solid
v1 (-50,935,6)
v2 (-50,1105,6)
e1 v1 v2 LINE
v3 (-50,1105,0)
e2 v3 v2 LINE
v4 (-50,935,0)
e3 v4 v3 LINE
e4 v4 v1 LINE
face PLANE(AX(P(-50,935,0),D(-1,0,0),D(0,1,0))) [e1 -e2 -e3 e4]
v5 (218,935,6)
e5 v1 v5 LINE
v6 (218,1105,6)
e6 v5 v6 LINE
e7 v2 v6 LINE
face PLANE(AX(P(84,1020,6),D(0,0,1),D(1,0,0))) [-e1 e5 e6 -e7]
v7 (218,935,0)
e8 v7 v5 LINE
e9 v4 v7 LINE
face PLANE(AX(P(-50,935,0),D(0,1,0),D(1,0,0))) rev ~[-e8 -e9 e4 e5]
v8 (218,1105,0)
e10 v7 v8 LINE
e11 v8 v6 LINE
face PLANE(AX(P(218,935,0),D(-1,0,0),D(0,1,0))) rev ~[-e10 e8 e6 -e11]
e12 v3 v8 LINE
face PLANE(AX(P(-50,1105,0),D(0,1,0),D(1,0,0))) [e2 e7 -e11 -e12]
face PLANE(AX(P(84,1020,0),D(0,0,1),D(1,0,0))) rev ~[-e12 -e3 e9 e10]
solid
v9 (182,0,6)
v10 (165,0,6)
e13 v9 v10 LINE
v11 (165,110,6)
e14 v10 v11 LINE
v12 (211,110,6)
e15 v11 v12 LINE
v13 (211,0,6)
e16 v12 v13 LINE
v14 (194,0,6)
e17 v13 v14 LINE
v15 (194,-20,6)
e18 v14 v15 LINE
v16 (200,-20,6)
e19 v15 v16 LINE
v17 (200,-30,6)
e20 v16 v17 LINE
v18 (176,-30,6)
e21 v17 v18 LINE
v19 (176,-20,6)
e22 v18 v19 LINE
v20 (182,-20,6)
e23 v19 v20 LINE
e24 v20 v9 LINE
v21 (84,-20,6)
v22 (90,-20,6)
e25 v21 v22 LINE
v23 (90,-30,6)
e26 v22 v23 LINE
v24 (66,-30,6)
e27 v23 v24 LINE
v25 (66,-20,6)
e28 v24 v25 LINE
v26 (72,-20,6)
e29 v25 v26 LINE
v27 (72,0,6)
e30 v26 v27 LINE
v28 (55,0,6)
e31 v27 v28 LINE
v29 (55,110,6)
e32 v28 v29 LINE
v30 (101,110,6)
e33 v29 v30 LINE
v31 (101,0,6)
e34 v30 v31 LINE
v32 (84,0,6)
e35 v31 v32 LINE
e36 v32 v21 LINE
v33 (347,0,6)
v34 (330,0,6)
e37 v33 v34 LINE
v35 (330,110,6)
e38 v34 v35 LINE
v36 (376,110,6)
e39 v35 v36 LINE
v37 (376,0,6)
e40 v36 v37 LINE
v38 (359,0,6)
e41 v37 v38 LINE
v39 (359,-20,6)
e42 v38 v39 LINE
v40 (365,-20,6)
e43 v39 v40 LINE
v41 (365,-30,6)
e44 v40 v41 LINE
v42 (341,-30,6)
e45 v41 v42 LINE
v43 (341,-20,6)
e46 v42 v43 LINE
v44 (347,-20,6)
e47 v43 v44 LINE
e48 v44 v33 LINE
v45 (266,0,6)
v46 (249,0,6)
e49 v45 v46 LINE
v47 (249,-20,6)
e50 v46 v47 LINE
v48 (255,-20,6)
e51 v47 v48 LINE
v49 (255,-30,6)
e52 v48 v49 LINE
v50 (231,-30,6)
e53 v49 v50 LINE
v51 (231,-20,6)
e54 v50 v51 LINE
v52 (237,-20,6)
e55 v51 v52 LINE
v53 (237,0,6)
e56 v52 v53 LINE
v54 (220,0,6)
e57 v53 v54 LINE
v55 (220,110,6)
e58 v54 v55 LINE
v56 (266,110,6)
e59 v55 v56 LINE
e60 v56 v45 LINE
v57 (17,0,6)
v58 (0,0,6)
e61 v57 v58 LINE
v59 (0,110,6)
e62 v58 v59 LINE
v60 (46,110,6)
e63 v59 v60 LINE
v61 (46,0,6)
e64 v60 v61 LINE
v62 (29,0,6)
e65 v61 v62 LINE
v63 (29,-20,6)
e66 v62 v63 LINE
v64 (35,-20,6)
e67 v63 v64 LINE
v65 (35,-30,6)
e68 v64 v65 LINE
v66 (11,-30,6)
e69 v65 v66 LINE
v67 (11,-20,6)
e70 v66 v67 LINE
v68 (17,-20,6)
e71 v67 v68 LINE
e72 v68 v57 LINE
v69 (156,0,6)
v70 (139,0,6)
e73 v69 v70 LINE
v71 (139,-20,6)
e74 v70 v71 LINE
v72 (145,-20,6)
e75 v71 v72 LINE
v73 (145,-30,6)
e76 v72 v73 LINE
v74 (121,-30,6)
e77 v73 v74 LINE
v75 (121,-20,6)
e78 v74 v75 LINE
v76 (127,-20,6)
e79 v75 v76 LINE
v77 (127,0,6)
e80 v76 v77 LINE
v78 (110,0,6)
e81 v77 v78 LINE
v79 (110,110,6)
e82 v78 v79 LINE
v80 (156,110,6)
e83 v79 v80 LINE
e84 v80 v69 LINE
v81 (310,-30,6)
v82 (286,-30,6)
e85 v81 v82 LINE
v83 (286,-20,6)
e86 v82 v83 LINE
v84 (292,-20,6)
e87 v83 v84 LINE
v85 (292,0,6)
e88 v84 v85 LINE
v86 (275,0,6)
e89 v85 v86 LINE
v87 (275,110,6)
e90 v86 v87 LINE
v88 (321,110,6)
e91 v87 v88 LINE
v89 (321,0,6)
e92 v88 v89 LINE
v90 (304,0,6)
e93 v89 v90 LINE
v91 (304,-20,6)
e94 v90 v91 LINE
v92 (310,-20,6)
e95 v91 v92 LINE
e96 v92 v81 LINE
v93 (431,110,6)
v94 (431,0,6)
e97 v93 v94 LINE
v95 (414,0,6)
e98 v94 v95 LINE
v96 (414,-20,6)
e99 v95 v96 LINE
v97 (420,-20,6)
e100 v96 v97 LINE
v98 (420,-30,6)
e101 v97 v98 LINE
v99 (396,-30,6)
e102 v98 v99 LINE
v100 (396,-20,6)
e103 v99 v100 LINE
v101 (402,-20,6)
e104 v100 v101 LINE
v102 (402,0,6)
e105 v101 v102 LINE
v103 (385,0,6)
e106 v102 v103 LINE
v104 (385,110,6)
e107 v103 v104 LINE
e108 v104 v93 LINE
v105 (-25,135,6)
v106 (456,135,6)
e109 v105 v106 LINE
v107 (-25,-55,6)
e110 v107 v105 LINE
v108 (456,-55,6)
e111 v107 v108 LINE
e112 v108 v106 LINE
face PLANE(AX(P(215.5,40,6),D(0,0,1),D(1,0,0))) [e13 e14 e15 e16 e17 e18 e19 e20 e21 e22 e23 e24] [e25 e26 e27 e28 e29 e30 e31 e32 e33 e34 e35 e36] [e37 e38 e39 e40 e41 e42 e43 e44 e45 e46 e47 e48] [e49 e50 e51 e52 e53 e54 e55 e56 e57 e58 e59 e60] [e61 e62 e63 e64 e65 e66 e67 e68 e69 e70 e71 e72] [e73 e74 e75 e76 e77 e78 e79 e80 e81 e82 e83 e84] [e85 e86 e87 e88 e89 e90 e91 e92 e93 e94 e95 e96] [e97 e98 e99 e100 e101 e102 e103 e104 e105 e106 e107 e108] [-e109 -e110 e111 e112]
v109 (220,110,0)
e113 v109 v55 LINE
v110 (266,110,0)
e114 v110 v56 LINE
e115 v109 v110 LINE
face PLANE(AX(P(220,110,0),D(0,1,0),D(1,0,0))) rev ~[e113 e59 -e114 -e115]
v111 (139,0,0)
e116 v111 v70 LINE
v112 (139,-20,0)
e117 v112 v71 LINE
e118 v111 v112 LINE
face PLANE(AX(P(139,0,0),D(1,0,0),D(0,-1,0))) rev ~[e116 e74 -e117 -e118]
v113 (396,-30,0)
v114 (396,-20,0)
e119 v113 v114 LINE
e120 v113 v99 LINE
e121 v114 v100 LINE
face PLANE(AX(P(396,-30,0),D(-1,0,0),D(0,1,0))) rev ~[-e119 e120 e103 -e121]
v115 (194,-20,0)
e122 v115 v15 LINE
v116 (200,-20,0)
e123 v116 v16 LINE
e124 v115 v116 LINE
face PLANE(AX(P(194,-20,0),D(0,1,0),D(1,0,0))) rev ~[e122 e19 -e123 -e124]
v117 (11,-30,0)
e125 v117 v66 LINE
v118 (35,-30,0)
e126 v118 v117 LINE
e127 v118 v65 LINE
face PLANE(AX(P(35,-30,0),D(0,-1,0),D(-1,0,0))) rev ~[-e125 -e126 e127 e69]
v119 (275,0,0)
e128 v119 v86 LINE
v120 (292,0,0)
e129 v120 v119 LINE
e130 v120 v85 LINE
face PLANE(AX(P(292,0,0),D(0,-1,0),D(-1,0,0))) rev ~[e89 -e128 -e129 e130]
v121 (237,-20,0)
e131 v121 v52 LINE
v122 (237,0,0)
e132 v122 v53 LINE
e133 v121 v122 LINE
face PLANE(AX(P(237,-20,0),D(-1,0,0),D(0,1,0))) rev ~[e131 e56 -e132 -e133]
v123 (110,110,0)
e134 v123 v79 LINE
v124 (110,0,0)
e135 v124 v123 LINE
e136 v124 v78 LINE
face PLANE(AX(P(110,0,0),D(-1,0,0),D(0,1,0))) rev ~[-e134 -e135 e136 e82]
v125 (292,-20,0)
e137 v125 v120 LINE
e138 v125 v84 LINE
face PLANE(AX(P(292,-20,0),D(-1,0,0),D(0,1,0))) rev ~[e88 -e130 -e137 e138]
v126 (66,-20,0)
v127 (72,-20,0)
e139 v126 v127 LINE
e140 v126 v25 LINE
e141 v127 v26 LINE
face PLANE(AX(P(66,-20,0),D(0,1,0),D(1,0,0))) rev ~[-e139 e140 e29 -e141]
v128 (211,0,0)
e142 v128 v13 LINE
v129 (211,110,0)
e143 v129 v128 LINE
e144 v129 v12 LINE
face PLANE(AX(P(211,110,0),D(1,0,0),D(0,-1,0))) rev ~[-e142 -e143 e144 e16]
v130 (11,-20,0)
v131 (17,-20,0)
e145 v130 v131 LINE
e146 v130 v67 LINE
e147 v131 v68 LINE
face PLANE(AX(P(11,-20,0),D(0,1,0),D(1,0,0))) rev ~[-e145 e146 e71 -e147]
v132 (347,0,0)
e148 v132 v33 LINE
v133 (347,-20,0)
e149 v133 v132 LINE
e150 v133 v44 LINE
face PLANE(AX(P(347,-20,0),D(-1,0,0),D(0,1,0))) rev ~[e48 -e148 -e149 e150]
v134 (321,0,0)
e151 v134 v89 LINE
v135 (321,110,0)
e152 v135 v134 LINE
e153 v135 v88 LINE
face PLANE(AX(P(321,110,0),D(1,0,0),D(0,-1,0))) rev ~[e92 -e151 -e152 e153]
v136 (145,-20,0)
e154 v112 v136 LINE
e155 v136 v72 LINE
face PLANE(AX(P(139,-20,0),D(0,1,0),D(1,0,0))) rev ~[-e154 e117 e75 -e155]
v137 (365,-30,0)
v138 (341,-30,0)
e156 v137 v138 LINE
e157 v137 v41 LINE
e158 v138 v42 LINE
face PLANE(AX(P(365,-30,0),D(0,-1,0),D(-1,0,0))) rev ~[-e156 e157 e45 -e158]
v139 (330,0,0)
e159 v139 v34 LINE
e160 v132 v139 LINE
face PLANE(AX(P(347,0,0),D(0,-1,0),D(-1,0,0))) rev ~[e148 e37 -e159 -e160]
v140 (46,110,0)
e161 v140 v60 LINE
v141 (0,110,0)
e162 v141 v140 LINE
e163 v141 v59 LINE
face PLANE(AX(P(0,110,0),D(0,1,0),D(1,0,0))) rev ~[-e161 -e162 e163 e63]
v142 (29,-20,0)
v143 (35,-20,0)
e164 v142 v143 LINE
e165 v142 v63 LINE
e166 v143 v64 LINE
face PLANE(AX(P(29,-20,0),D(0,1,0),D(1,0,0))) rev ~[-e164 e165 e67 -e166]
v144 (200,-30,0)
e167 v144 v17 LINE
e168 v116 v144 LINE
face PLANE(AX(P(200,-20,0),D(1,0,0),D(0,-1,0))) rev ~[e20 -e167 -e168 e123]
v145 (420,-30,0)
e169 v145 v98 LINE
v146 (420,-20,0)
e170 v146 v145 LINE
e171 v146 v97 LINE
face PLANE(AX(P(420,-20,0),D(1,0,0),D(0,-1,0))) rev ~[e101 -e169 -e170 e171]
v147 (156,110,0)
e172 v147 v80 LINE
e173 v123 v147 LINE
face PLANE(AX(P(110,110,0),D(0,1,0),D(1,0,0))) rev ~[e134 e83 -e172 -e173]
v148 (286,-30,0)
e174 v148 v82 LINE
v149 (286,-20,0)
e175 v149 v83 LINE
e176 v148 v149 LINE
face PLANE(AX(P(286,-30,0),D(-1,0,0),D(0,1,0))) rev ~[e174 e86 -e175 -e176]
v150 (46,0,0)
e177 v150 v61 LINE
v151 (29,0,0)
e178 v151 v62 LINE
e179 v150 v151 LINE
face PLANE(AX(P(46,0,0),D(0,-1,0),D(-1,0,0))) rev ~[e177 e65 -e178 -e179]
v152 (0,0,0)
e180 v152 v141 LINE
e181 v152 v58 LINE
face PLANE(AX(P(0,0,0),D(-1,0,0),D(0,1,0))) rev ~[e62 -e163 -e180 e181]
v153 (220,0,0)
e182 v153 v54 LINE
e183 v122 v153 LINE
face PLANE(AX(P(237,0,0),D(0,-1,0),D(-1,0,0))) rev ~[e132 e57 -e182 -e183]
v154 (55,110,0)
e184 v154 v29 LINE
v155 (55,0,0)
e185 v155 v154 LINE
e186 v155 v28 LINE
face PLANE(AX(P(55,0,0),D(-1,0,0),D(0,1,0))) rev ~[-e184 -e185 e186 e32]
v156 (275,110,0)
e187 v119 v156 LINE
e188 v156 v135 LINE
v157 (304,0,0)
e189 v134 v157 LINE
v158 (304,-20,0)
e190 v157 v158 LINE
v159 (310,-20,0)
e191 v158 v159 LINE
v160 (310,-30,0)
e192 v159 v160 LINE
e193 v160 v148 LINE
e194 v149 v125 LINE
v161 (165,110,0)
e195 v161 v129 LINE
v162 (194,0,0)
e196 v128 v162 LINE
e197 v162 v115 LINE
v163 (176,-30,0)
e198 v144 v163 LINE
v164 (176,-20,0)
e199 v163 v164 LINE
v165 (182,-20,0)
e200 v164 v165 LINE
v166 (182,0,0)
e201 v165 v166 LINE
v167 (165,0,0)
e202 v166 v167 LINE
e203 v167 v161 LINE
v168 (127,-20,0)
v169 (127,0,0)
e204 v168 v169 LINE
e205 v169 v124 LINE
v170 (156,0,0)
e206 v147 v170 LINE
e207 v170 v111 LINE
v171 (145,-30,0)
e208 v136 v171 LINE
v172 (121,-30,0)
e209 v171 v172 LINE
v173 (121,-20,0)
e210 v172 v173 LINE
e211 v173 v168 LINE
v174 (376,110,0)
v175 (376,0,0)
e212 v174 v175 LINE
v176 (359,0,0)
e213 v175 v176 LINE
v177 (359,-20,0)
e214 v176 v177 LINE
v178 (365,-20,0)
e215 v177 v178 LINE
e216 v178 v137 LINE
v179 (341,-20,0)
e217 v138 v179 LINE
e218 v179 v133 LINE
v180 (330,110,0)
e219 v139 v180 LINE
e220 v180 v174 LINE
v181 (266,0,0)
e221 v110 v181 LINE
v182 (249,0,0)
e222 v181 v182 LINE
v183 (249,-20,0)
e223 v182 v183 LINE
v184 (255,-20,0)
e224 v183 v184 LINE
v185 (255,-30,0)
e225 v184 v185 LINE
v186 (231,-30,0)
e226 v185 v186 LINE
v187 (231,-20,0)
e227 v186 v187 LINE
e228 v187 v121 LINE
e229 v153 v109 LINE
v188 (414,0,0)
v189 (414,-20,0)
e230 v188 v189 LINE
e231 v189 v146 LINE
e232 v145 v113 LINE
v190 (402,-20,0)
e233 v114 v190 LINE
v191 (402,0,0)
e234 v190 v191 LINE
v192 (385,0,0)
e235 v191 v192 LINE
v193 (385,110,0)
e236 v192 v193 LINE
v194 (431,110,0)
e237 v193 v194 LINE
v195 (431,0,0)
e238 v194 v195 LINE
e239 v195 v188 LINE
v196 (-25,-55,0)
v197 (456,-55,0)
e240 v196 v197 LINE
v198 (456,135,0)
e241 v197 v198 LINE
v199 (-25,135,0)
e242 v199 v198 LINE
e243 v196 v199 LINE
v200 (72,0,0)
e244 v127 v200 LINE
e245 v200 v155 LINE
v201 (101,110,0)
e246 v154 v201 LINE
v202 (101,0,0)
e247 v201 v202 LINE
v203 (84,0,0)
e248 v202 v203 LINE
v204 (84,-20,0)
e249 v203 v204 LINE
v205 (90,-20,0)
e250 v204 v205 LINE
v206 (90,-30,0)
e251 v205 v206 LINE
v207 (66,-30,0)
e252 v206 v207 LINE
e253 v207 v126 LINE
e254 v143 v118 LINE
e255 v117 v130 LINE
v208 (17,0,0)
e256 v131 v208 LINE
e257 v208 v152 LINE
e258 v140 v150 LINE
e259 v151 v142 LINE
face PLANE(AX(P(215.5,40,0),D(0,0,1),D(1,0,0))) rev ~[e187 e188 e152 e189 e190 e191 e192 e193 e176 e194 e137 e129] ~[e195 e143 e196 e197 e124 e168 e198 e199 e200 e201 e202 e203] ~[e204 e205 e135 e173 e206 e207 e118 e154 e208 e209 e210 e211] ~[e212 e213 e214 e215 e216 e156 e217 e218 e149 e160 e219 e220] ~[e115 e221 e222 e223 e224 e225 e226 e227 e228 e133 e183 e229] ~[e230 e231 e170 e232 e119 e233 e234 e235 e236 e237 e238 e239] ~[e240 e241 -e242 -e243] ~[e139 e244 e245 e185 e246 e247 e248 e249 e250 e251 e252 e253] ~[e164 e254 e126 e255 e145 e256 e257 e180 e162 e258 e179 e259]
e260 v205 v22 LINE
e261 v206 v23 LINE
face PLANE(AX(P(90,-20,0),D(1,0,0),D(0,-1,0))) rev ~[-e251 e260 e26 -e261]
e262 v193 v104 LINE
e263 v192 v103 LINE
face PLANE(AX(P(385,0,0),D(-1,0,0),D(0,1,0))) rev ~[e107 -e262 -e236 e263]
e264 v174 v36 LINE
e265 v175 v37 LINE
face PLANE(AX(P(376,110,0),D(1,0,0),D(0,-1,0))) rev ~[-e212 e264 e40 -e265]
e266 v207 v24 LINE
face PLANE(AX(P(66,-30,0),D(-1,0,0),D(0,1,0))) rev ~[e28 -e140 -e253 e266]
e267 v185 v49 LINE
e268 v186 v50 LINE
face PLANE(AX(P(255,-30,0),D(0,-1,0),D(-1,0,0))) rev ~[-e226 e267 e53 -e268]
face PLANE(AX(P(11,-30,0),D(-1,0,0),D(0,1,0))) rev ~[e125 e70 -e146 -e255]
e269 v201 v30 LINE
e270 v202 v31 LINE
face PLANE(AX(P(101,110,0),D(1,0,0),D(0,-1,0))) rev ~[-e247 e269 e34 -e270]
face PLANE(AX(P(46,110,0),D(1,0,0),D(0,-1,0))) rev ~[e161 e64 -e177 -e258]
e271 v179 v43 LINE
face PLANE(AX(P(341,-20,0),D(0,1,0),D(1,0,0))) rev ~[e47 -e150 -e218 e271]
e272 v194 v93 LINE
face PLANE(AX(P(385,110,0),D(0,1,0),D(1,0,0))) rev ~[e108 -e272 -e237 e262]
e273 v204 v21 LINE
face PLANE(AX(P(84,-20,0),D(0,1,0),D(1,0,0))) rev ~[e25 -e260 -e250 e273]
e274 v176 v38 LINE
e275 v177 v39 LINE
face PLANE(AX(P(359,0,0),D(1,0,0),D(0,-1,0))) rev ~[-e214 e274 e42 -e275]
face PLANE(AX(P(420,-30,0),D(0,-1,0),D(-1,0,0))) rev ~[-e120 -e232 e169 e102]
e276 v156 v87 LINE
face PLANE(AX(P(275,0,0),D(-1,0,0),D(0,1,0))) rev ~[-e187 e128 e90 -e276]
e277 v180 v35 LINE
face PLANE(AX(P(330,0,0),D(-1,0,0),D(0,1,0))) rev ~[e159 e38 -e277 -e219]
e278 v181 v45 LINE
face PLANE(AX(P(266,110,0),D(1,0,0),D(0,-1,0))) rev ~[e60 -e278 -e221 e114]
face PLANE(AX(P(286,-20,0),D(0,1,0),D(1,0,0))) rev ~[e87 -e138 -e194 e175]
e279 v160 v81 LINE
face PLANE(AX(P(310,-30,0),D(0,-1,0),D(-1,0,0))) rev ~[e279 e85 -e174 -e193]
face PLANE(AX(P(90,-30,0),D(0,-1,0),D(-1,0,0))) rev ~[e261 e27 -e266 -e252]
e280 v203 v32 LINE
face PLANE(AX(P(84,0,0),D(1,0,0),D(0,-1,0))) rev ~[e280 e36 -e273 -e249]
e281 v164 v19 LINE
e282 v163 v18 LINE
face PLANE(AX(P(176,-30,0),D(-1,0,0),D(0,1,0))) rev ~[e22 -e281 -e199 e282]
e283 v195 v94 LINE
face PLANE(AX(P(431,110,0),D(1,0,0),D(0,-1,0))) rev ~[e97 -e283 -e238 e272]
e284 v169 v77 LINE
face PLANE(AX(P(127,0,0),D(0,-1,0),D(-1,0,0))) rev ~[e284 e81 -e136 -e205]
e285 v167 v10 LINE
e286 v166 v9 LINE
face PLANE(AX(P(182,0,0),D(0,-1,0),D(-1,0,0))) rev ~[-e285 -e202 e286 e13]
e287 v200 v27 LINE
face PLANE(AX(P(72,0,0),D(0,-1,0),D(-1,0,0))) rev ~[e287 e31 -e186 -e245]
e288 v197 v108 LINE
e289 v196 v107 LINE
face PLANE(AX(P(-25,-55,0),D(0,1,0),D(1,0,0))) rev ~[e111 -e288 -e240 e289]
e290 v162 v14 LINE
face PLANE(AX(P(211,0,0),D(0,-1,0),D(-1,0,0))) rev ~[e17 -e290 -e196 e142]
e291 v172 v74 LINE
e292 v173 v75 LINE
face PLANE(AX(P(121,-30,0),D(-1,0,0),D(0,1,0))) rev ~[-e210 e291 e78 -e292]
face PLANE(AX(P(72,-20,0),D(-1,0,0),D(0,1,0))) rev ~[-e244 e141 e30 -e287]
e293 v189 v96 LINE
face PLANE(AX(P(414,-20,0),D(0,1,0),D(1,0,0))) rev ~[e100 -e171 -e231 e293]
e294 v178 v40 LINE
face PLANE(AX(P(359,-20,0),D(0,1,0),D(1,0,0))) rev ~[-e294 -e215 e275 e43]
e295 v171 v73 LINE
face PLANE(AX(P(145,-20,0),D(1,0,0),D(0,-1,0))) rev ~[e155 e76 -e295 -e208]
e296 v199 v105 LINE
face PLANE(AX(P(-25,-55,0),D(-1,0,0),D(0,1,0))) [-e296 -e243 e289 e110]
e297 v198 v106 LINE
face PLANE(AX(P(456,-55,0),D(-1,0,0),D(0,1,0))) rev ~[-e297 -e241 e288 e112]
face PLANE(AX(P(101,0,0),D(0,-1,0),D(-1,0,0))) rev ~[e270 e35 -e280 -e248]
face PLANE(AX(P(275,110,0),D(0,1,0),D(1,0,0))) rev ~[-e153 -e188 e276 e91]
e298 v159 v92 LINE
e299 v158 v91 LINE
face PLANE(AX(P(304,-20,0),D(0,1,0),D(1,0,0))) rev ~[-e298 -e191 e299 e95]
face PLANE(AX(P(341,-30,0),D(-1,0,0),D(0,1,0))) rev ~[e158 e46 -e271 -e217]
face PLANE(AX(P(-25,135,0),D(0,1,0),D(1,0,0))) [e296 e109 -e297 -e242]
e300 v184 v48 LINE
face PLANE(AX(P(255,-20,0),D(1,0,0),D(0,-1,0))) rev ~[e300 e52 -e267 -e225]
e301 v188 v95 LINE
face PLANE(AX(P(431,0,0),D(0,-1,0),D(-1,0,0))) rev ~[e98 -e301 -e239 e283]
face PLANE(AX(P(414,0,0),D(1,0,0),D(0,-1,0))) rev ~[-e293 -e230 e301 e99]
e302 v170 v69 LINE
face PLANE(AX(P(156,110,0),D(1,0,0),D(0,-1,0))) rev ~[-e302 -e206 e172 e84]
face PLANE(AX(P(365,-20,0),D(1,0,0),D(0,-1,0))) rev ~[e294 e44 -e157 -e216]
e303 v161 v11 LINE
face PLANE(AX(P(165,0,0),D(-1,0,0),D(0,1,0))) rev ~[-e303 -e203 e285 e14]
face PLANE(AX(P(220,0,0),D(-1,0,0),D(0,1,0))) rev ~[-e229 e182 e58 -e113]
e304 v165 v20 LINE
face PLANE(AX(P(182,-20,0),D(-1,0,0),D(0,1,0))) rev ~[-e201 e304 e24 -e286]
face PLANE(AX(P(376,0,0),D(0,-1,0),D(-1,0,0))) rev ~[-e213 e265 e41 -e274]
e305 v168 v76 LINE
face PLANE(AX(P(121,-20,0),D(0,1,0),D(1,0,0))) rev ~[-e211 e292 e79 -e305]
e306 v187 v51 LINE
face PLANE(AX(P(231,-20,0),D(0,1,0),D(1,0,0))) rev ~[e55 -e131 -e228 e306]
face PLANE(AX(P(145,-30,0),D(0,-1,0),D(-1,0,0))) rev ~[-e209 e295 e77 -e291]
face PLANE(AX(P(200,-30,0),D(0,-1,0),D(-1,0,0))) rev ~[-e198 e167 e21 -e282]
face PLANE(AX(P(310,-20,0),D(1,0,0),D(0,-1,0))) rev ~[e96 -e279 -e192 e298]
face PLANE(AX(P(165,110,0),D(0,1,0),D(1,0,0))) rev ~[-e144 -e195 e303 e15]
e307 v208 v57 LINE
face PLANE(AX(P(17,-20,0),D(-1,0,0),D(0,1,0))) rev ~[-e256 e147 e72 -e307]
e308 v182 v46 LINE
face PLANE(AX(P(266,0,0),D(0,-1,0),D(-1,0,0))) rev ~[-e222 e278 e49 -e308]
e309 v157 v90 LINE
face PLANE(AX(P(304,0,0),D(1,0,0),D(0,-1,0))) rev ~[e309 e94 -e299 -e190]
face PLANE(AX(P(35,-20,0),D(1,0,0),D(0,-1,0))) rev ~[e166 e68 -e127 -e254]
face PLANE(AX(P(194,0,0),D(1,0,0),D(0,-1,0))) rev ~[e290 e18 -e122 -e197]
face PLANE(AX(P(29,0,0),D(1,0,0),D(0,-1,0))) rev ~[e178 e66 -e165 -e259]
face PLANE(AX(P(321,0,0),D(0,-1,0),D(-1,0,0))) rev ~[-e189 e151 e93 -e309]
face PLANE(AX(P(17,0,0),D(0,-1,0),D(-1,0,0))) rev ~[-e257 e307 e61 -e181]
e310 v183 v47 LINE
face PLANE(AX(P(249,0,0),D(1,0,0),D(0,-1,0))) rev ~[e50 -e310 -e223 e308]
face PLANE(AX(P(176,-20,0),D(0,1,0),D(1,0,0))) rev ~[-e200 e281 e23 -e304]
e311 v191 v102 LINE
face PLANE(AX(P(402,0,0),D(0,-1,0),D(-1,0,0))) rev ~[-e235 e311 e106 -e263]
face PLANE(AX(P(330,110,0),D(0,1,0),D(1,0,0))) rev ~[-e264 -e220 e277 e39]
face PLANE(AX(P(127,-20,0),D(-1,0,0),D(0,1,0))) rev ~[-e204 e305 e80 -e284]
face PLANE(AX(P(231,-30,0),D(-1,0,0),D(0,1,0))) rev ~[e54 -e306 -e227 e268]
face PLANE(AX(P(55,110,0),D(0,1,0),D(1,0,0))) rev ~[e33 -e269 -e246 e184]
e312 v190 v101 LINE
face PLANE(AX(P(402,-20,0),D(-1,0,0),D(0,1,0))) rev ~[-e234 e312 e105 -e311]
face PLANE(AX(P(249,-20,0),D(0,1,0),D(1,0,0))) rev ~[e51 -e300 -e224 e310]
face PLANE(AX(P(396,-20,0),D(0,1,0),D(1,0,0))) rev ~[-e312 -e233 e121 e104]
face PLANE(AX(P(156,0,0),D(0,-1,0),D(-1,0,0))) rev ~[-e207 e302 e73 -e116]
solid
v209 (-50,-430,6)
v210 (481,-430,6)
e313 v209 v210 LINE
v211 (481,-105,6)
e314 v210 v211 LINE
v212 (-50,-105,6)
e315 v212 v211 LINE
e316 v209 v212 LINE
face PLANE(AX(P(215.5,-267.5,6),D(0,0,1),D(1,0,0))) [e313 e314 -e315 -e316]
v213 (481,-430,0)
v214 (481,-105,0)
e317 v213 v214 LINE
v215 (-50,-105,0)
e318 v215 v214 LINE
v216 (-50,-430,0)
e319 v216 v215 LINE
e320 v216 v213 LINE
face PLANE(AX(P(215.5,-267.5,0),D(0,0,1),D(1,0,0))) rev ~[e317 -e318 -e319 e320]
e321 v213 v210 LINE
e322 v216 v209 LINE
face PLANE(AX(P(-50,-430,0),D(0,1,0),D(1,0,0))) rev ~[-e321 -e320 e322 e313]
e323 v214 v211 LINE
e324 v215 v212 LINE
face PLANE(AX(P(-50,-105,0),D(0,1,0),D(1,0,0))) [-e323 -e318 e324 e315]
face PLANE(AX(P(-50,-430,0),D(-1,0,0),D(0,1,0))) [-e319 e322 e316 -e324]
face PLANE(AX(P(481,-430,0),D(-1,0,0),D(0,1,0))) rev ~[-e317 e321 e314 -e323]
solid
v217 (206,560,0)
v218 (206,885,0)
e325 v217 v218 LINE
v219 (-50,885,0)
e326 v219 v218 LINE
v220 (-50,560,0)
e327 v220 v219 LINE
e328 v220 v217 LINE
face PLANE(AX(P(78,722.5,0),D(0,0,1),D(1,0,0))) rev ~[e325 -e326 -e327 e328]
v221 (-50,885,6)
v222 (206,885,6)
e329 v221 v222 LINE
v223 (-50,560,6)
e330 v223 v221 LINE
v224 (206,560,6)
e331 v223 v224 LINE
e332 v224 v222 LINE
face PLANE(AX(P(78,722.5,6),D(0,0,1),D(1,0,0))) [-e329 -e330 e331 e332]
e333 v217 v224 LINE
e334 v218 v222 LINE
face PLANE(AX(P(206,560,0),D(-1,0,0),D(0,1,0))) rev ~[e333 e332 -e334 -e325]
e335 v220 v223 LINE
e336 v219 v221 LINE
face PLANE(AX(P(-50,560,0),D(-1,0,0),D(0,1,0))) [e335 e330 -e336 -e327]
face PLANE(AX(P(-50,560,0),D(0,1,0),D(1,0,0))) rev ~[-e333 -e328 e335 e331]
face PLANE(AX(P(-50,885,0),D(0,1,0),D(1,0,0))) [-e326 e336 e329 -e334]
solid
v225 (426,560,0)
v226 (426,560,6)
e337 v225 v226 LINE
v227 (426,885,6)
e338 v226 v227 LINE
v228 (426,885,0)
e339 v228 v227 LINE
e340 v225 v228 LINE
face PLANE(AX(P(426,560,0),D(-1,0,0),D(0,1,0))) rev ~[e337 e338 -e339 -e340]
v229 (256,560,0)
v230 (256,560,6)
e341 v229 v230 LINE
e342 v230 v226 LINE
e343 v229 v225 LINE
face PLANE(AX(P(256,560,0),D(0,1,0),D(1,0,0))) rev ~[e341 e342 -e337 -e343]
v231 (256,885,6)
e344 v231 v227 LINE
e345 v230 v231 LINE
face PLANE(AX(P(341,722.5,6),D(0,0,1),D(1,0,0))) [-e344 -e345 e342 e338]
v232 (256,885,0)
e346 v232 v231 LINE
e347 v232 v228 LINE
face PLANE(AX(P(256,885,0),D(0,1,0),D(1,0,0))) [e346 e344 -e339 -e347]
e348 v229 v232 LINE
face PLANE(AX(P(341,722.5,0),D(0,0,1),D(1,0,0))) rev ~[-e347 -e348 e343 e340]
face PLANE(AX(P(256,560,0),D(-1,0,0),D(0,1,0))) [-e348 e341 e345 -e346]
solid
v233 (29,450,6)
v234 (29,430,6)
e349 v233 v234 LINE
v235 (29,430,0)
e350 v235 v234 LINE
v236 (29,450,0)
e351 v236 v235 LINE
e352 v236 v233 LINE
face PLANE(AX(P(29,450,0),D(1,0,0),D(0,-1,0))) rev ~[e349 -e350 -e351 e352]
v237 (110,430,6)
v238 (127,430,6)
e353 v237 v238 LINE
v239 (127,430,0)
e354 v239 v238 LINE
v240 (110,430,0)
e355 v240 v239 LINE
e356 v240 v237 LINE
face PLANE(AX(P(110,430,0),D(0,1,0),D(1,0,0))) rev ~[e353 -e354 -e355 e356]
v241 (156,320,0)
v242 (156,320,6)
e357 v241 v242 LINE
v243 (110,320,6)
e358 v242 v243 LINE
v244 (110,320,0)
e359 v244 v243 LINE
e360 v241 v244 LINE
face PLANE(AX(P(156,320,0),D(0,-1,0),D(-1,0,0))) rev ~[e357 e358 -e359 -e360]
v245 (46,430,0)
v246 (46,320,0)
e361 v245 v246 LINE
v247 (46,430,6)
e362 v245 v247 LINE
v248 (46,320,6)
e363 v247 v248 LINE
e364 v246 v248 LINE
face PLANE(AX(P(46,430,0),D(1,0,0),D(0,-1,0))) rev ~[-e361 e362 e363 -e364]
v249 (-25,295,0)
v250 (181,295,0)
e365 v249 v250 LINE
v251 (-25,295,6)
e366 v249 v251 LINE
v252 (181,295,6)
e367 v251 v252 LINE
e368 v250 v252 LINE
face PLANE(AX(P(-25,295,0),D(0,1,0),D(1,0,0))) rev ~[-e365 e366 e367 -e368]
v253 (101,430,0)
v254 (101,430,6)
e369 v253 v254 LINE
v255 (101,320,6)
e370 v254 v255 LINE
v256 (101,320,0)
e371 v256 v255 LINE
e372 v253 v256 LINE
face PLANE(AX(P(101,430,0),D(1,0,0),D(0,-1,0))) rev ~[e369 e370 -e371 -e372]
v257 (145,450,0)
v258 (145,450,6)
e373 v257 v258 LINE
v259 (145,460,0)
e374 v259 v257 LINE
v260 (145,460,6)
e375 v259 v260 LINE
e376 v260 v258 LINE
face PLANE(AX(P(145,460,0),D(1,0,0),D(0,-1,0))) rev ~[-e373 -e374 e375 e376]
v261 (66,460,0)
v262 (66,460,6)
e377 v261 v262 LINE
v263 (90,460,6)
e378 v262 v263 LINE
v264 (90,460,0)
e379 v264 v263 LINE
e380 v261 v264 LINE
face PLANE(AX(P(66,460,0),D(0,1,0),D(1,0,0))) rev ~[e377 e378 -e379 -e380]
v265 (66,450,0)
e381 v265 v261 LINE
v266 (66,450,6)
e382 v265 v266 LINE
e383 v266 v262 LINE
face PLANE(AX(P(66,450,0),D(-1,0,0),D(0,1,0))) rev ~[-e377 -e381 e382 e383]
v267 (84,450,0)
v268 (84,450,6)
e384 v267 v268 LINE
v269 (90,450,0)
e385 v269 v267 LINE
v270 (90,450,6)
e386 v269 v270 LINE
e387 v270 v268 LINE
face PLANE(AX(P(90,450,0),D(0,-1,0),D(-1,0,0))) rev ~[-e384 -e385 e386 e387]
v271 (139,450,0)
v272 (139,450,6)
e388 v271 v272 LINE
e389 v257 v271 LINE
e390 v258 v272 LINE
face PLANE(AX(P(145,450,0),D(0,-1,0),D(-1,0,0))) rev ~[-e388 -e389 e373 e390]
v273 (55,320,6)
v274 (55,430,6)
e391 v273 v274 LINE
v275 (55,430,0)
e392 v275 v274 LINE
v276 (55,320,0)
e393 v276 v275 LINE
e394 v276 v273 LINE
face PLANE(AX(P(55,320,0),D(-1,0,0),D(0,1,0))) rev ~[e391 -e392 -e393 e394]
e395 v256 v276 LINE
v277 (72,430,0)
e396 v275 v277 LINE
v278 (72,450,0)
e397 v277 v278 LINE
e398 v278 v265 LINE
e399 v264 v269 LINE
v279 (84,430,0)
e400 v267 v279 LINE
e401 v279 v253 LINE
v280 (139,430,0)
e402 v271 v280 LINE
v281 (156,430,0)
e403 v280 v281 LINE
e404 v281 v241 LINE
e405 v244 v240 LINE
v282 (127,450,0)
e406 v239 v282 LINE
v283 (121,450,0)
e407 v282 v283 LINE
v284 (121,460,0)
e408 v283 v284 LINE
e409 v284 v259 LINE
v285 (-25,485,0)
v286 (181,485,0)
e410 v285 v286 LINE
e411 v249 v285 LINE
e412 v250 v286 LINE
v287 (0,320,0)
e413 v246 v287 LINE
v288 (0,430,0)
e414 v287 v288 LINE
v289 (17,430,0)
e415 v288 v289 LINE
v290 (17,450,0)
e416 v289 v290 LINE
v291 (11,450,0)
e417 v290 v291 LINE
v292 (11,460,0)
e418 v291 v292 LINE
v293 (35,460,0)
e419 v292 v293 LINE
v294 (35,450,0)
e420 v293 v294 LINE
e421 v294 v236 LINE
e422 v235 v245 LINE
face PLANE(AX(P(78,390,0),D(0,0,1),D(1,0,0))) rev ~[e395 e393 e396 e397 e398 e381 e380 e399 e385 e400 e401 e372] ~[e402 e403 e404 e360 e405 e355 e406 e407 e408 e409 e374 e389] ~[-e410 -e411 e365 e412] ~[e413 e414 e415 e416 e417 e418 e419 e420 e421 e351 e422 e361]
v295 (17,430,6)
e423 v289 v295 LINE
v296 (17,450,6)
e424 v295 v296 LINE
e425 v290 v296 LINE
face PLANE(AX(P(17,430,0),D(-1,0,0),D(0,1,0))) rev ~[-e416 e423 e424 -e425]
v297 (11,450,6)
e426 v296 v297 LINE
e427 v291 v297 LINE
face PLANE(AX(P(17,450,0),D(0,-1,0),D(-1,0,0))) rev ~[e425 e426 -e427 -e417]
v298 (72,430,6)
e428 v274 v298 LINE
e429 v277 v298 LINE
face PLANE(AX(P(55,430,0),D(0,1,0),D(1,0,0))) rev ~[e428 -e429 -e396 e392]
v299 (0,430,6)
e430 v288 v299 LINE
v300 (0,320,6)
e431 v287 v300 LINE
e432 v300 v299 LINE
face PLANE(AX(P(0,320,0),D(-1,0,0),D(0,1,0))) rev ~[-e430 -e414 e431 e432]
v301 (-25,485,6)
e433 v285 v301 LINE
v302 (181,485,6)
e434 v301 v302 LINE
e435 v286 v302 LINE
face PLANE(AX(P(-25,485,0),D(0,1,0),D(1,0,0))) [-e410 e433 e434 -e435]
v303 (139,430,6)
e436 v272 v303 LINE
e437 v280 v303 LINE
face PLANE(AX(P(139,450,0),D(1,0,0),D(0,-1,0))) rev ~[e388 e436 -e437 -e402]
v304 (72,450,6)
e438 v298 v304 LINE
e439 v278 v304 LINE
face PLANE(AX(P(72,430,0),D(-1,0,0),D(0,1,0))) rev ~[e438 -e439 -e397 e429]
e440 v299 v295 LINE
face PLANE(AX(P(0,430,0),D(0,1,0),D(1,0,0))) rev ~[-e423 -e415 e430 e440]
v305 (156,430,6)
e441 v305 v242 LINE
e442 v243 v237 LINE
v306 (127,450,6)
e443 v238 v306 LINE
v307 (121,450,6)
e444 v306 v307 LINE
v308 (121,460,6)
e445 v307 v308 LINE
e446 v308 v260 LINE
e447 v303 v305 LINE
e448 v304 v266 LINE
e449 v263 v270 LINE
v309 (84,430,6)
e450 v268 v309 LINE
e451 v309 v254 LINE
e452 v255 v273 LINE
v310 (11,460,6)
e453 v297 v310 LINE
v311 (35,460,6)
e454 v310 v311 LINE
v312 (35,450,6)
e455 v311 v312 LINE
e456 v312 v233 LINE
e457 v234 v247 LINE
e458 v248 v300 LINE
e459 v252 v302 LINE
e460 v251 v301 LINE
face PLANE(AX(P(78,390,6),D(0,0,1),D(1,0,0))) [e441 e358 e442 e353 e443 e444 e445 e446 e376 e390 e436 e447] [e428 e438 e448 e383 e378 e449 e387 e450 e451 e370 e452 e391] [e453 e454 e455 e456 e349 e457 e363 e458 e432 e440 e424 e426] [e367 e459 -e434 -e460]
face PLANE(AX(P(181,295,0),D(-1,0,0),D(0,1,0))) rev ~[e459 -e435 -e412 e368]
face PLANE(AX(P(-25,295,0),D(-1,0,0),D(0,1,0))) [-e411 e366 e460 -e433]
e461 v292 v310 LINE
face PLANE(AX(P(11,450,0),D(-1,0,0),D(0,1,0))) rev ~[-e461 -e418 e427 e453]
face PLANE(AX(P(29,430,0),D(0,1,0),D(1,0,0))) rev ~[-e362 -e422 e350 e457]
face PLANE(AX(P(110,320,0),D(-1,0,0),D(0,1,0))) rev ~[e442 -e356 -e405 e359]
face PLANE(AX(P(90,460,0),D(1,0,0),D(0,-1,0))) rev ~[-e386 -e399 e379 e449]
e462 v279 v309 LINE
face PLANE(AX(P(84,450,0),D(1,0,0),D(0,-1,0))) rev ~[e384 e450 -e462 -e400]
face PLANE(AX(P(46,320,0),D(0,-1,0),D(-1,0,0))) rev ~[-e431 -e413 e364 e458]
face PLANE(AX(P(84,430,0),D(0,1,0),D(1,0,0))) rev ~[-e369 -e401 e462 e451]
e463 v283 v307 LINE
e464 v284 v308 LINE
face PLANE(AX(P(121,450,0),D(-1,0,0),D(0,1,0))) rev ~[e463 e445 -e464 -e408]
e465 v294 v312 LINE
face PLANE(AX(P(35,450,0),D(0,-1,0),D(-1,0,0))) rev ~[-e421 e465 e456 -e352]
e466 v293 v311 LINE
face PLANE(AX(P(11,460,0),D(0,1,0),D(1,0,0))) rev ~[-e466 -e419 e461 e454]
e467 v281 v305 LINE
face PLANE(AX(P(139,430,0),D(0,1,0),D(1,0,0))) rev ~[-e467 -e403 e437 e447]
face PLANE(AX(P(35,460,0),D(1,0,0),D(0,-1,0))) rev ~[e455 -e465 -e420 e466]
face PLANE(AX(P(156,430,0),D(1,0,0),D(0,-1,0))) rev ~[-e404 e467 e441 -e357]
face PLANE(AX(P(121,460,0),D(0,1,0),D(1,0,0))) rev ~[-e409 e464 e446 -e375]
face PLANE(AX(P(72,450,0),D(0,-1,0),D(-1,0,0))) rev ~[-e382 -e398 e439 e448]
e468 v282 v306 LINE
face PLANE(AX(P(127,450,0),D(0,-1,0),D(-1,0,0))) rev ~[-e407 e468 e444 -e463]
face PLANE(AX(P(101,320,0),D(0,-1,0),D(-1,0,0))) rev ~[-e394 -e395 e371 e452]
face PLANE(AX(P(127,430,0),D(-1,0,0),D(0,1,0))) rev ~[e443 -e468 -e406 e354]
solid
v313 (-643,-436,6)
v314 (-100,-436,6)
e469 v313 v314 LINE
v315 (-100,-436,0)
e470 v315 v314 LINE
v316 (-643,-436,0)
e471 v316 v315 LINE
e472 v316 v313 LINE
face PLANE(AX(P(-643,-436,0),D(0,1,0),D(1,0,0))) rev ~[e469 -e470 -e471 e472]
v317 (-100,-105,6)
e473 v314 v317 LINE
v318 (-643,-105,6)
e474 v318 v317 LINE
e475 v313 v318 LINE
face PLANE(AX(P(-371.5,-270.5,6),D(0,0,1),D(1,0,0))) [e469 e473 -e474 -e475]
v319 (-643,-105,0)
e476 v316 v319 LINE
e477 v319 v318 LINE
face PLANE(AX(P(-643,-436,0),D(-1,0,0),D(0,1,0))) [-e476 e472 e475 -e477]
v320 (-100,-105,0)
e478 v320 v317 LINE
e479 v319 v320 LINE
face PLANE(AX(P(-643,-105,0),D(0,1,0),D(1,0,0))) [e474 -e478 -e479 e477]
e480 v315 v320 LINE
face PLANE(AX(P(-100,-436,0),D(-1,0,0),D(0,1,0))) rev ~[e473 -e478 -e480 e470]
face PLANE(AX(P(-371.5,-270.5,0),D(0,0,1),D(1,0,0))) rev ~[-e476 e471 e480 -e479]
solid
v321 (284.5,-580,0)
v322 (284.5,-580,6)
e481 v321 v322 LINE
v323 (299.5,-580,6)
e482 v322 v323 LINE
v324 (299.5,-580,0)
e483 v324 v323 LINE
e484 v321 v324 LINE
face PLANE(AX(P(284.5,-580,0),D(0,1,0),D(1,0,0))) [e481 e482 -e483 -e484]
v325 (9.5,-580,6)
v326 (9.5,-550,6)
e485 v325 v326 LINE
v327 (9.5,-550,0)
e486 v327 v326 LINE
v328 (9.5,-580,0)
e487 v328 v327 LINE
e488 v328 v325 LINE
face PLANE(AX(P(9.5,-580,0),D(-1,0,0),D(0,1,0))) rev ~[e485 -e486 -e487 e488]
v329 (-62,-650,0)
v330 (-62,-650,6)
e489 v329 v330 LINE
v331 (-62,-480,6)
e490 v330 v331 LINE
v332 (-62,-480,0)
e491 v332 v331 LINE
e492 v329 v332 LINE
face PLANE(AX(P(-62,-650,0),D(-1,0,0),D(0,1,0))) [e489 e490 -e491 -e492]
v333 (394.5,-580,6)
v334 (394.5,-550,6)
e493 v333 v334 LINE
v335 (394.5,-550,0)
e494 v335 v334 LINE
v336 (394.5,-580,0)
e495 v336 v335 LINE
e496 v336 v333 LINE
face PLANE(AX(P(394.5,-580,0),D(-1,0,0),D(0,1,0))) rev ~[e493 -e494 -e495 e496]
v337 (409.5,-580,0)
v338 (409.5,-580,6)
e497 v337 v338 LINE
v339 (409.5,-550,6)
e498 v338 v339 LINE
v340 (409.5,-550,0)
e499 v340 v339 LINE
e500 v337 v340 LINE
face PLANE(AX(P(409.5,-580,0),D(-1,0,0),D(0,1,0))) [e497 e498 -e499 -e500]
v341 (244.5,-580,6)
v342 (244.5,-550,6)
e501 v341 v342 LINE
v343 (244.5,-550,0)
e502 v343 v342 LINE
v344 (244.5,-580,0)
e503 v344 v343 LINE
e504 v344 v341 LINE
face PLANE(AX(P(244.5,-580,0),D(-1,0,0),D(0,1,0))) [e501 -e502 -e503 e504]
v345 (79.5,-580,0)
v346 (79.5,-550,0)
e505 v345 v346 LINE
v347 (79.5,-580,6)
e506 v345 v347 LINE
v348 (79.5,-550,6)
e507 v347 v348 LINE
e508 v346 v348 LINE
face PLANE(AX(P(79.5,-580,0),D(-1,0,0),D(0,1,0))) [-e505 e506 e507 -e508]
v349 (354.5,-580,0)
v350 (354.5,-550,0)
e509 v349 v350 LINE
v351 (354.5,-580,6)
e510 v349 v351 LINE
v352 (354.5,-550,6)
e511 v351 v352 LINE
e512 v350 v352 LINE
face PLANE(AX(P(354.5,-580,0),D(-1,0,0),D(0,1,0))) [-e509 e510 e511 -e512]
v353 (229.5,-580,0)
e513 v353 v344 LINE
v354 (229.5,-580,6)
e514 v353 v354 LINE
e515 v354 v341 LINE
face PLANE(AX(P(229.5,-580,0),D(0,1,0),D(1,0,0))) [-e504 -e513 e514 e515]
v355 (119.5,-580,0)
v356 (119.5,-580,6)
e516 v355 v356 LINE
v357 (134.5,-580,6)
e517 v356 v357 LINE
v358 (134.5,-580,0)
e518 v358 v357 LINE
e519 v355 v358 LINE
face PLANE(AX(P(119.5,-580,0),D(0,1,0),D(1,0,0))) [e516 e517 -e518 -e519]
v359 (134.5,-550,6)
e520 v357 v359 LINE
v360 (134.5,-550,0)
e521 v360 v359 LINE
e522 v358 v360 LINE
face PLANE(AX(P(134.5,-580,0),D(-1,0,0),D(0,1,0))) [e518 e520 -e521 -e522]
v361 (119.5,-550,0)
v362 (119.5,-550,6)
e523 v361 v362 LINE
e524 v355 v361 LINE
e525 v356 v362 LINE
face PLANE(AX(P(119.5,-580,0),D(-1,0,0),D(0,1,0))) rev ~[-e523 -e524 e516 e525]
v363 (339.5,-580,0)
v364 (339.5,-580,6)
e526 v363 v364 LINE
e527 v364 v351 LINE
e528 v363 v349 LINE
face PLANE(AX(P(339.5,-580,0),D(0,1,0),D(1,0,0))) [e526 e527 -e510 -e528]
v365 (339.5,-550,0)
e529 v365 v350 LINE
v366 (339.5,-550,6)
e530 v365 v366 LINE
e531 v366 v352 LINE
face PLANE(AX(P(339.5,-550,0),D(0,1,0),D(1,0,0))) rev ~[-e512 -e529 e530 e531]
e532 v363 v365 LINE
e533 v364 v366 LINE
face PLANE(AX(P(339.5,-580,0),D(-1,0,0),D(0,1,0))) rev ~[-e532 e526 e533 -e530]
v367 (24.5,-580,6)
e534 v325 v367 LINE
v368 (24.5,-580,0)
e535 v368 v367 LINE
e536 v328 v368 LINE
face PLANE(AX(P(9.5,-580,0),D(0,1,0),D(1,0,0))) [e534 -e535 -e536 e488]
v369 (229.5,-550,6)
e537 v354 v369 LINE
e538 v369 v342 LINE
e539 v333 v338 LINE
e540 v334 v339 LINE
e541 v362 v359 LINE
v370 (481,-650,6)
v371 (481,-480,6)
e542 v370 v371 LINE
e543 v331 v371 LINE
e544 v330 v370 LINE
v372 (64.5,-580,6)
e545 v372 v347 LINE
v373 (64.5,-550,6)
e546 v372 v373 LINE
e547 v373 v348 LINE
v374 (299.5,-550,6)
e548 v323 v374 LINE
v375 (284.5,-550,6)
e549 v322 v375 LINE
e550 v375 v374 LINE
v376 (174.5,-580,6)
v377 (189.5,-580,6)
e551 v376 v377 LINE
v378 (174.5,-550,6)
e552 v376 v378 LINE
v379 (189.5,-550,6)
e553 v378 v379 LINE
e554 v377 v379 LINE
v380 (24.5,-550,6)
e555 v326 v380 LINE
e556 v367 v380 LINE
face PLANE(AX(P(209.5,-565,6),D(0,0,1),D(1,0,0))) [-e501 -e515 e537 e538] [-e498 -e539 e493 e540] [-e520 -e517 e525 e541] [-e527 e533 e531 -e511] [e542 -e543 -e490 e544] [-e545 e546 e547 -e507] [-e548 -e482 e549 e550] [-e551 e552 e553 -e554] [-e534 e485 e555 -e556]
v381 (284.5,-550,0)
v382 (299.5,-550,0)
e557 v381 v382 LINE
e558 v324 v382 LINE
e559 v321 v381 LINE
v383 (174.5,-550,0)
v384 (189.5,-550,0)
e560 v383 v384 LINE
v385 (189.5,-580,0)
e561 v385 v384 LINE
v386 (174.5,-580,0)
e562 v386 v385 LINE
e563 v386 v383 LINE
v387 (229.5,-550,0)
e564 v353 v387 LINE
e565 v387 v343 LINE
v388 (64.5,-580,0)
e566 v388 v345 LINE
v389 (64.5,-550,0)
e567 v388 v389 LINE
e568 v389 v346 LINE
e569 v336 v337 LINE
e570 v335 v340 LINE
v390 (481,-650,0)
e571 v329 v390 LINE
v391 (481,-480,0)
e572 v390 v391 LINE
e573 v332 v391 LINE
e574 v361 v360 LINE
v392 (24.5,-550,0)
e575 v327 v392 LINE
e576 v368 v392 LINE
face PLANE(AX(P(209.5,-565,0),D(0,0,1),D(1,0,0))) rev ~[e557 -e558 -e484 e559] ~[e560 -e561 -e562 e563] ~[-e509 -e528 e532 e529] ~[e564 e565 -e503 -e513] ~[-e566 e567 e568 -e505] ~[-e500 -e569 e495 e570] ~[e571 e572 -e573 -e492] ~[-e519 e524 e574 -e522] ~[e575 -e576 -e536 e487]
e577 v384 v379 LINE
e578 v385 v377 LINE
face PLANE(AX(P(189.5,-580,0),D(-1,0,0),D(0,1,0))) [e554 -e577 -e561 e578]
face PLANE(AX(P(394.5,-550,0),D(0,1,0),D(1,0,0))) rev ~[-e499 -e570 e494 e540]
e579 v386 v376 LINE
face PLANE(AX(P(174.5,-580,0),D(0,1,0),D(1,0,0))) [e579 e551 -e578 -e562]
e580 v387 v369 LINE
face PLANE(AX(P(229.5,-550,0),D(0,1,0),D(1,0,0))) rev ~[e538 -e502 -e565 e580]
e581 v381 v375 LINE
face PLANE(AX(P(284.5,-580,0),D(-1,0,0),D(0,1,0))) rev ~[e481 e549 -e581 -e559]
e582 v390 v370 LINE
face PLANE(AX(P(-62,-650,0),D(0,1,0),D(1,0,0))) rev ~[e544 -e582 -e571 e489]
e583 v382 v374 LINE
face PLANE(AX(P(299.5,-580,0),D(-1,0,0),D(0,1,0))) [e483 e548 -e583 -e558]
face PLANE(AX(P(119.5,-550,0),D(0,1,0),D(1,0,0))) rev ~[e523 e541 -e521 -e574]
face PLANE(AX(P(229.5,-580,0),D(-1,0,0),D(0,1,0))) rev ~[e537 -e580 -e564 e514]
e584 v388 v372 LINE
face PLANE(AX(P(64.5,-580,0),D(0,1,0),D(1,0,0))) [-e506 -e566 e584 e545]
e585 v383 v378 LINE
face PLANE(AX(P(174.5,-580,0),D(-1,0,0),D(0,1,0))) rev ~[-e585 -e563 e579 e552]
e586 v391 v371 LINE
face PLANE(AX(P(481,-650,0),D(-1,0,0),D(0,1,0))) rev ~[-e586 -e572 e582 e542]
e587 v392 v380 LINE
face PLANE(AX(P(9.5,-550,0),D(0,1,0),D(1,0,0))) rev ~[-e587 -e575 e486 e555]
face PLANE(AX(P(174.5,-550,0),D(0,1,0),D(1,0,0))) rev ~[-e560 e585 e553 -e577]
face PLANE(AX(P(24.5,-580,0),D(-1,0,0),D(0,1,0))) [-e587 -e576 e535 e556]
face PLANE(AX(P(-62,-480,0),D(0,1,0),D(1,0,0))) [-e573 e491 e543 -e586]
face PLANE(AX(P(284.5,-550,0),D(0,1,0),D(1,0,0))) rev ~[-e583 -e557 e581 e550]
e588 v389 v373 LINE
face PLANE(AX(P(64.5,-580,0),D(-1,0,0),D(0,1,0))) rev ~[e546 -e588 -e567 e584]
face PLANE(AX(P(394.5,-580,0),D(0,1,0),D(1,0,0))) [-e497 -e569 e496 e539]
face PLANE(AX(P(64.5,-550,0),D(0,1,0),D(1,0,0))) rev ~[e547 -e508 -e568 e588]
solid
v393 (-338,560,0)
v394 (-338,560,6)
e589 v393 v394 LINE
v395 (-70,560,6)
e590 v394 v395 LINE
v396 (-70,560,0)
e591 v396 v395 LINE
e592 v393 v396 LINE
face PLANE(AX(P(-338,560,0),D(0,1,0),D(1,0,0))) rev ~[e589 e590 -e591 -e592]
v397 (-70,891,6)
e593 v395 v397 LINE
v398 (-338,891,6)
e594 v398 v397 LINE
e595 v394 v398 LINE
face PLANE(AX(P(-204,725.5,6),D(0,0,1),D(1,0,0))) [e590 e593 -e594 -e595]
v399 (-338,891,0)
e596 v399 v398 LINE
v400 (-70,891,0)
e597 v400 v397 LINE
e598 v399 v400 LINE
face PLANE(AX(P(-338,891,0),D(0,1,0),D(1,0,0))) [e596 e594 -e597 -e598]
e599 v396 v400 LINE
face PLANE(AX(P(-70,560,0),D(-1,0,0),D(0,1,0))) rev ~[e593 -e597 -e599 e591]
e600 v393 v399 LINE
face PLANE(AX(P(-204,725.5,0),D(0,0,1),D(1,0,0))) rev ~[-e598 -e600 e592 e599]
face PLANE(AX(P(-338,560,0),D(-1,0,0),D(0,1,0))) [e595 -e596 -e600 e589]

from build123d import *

# Parameters (mm, degrees)
F0_W     = 481
F0_H     = 190
F1_DEPTH = 6
F0_W_2   = 206
F0_W_3   = 531
F0_H_2   = 325
F2_DEPTH = 6
F0_W_4   = 256
F0_W_5   = 170
F0_W_6   = 268
F0_H_3   = 170
F0_H_4   = 331
F0_W_7   = 543
F0_W_8   = 15
F0_H_5   = 30


# Not quite as in the source:
# - a feature names something its author has since deleted; it is built from what else it names


with BuildPart() as f1:
    # F0 (on Top) → F1 (new body)
    with BuildSketch(Plane.XY):
        with Locations((215.5, 40)):
            Rectangle(F0_W, F0_H)
        Polygon((17, 0), (0, 0), (0, 110), (46, 110), (46, 0), (29, 0), (29, -20), (35, -20), (35, -30), (29, -30), (17, -30), (11, -30), (11, -20), (17, -20), align=None, mode=Mode.SUBTRACT)
        Polygon((101, 110), (101, 0), (84, 0), (84, -20), (90, -20), (90, -30), (84, -30), (72, -30), (66, -30), (66, -20), (72, -20), (72, 0), (55, 0), (55, 110), align=None, mode=Mode.SUBTRACT)
        Polygon((156, 110), (156, 0), (139, 0), (139, -20), (145, -20), (145, -30), (139, -30), (127, -30), (121, -30), (121, -20), (127, -20), (127, 0), (110, 0), (110, 110), align=None, mode=Mode.SUBTRACT)
        Polygon((211, 110), (211, 0), (194, 0), (194, -20), (200, -20), (200, -30), (194, -30), (182, -30), (176, -30), (176, -20), (182, -20), (182, 0), (165, 0), (165, 110), align=None, mode=Mode.SUBTRACT)
        Polygon((266, 110), (266, 0), (249, 0), (249, -20), (255, -20), (255, -30), (249, -30), (237, -30), (231, -30), (231, -20), (237, -20), (237, 0), (220, 0), (220, 110), align=None, mode=Mode.SUBTRACT)
        Polygon((321, 110), (321, 0), (304, 0), (304, -20), (310, -20), (310, -30), (304, -30), (292, -30), (286, -30), (286, -20), (292, -20), (292, 0), (275, 0), (275, 110), align=None, mode=Mode.SUBTRACT)
        Polygon((376, 110), (376, 0), (359, 0), (359, -20), (365, -20), (365, -30), (359, -30), (347, -30), (341, -30), (341, -20), (347, -20), (347, 0), (330, 0), (330, 110), align=None, mode=Mode.SUBTRACT)
        Polygon((431, 110), (431, 0), (414, 0), (414, -20), (420, -20), (420, -30), (414, -30), (402, -30), (396, -30), (396, -20), (402, -20), (402, 0), (385, 0), (385, 110), align=None, mode=Mode.SUBTRACT)
    extrude(amount=F1_DEPTH)


with BuildPart() as f1b:
    # F0 (on Top) → F1, piece 2 (new body)
    with BuildSketch(Plane.XY):
        with Locations((78, 390)):
            Rectangle(F0_W_2, F0_H)
        Polygon((17, 430), (17, 450), (11, 450), (11, 460), (17, 460), (29, 460), (35, 460), (35, 450), (29, 450), (29, 430), (46, 430), (46, 320), (0, 320), (0, 430), align=None, mode=Mode.SUBTRACT)
        Polygon((72, 460), (84, 460), (90, 460), (90, 450), (84, 450), (84, 430), (101, 430), (101, 320), (55, 320), (55, 430), (72, 430), (72, 450), (66, 450), (66, 460), align=None, mode=Mode.SUBTRACT)
        Polygon((127, 460), (139, 460), (145, 460), (145, 450), (139, 450), (139, 430), (156, 430), (156, 320), (110, 320), (110, 430), (127, 430), (127, 450), (121, 450), (121, 460), align=None, mode=Mode.SUBTRACT)
    extrude(amount=F1_DEPTH)


with BuildPart() as f2:
    # F0 (on Top) → F2 (new body)
    with BuildSketch(Plane.XY):
        with Locations((215.5, -267.5)):
            Rectangle(F0_W_3, F0_H_2)
    extrude(amount=F2_DEPTH)


with BuildPart() as f2b:
    # F0 (on Top) → F2, piece 2 (new body)
    with BuildSketch(Plane.XY):
        with Locations((78, 722.5)):
            Rectangle(F0_W_4, F0_H_2)
    extrude(amount=F2_DEPTH)


with BuildPart() as f2c:
    # F0 (on Top) → F2, piece 3 (new body)
    with BuildSketch(Plane.XY):
        with Locations((341, 722.5)):
            Rectangle(F0_W_5, F0_H_2)
    extrude(amount=F2_DEPTH)


with BuildPart() as f2d:
    # F0 (on Top) → F2, piece 4 (new body)
    with BuildSketch(Plane.XY):
        with Locations((84, 1020)):
            Rectangle(F0_W_6, F0_H_3)
    extrude(amount=F2_DEPTH)


with BuildPart() as f2e:
    # F0 (on Top) → F2, piece 5 (new body)
    with BuildSketch(Plane.XY):
        with Locations((-204, 725.5)):
            Rectangle(F0_W_6, F0_H_4)
    extrude(amount=F2_DEPTH)


with BuildPart() as f2f:
    # F0 (on Top) → F2, piece 6 (new body)
    with BuildSketch(Plane.XY):
        with Locations((209.5, -565)):
            Rectangle(F0_W_7, F0_H_3)
        with Locations((17, -565)):
            Rectangle(F0_W_8, F0_H_5, mode=Mode.SUBTRACT)
        with Locations((72, -565)):
            Rectangle(F0_W_8, F0_H_5, mode=Mode.SUBTRACT)
        with Locations((127, -565)):
            Rectangle(F0_W_8, F0_H_5, mode=Mode.SUBTRACT)
        with Locations((182, -565)):
            Rectangle(F0_W_8, F0_H_5, mode=Mode.SUBTRACT)
        with Locations((237, -565)):
            Rectangle(F0_W_8, F0_H_5, mode=Mode.SUBTRACT)
        with Locations((292, -565)):
            Rectangle(F0_W_8, F0_H_5, mode=Mode.SUBTRACT)
        with Locations((347, -565)):
            Rectangle(F0_W_8, F0_H_5, mode=Mode.SUBTRACT)
        with Locations((402, -565)):
            Rectangle(F0_W_8, F0_H_5, mode=Mode.SUBTRACT)
    extrude(amount=F2_DEPTH)


with BuildPart() as f2g:
    # F0 (on Top) → F2, piece 7 (new body)
    with BuildSketch(Plane.XY):
        with Locations((-371.5, -270.5)):
            Rectangle(F0_W_7, F0_H_4)
    extrude(amount=F2_DEPTH)


solid = Compound([f1.part, f1b.part, f2.part, f2b.part, f2c.part, f2d.part, f2e.part, f2f.part, f2g.part])
